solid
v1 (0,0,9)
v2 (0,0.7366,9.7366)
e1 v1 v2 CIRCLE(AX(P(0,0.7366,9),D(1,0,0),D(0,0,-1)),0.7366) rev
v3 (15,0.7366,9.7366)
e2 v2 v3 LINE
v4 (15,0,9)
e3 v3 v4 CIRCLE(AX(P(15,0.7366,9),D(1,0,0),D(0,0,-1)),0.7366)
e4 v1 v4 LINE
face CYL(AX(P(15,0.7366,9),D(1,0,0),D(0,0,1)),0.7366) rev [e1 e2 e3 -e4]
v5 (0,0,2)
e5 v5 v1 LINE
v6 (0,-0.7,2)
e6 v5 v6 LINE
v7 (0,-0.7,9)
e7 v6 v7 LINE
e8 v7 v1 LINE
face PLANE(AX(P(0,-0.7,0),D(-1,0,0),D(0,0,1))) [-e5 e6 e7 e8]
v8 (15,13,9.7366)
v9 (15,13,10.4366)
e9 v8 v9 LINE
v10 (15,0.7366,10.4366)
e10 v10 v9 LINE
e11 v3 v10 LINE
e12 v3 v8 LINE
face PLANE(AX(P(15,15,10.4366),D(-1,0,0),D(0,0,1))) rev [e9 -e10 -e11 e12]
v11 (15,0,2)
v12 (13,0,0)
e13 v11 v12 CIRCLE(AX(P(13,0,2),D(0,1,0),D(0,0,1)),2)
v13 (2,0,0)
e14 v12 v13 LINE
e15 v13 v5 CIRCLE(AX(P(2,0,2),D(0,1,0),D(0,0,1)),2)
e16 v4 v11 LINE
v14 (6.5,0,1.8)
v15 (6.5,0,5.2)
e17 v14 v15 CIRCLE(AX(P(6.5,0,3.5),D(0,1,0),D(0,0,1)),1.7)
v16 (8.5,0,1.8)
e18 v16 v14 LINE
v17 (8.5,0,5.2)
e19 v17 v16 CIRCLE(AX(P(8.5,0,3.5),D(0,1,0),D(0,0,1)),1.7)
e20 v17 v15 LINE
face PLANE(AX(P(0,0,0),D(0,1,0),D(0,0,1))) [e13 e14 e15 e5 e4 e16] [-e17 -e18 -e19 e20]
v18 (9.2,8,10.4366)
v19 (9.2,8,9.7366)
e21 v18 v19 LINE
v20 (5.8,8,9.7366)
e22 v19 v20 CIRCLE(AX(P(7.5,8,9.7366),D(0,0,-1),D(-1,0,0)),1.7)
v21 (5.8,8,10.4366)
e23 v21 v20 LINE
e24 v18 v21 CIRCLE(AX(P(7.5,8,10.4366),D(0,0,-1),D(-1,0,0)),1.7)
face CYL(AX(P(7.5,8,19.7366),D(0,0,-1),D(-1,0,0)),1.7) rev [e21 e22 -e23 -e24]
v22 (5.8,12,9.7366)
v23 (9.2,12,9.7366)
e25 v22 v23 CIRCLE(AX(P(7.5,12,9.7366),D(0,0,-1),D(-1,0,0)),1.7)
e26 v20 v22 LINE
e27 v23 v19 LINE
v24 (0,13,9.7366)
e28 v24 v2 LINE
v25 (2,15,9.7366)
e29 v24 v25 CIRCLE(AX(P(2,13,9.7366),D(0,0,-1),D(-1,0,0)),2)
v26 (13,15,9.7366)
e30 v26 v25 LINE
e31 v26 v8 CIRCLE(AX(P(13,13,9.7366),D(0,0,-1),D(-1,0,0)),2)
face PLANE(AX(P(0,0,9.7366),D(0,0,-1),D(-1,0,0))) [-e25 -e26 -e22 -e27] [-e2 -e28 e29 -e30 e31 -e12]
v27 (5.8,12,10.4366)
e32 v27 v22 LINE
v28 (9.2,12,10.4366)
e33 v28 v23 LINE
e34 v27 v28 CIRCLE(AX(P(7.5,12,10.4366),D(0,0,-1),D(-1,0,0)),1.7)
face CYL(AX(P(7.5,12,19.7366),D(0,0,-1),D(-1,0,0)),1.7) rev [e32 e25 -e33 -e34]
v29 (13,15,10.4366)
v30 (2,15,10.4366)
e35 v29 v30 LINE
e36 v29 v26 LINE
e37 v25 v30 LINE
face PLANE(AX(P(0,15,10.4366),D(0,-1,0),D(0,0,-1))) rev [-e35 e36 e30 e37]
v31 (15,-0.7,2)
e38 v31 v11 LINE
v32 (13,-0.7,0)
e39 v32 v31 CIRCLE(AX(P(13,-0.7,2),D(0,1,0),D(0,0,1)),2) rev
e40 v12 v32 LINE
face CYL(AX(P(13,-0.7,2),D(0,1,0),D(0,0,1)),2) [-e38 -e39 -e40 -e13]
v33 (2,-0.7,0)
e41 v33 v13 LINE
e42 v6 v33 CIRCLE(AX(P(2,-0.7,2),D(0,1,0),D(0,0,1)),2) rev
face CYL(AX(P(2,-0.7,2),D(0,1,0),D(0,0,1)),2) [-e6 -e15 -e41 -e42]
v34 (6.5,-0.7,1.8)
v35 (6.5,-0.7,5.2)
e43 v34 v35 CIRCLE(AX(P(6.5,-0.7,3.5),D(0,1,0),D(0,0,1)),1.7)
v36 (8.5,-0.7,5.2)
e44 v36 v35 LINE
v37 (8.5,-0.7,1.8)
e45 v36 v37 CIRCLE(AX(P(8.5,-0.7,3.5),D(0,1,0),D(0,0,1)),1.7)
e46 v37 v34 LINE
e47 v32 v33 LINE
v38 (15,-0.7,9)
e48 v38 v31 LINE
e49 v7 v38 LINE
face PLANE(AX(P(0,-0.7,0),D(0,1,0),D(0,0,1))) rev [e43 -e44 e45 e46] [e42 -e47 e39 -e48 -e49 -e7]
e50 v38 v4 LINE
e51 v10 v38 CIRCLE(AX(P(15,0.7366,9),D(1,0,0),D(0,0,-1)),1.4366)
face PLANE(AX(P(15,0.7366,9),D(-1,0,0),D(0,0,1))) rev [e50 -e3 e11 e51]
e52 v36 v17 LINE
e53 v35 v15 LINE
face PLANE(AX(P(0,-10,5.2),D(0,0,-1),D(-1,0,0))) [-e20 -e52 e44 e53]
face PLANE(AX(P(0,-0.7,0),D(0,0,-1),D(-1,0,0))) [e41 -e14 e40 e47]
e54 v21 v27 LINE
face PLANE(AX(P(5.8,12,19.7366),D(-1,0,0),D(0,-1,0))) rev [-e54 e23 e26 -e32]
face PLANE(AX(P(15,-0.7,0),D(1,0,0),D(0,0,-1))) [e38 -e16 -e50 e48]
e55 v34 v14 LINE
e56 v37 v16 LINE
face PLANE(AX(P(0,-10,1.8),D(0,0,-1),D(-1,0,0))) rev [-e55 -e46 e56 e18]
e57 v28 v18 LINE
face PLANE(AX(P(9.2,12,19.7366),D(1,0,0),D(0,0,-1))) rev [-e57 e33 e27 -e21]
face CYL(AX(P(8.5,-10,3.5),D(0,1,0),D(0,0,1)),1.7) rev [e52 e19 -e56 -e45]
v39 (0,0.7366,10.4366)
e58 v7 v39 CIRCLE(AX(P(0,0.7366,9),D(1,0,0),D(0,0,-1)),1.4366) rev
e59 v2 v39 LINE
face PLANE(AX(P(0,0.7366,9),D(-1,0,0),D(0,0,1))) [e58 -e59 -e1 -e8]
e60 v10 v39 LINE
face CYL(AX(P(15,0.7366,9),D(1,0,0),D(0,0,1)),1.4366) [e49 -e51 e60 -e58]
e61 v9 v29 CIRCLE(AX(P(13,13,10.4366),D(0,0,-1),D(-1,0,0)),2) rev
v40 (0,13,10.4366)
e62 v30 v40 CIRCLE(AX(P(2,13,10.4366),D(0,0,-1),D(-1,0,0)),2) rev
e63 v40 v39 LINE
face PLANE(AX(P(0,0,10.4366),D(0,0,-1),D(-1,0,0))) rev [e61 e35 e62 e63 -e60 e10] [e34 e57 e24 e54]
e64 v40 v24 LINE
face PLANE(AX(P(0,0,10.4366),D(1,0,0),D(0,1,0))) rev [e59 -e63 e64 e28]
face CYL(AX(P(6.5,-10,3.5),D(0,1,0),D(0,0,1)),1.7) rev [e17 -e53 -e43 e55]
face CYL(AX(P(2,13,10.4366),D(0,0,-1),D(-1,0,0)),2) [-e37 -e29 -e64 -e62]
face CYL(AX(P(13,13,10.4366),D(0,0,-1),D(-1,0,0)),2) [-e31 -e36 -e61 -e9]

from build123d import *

# Parameters (mm, degrees)
SKETCH1_W          = 15
SKETCH1_H          = 9
BASE_FLANGE1_DEPTH = 0.7
EDGE_FLANGE1_DEPTH = 15
CUT_EXTRUDE1_DEPTH = 10
FILLET1_R          = 2
CUT_EXTRUDE2_DEPTH = 10


# Sheet-metal steps are written as plain solids
with BuildPart() as part:
    # Sketch1 → Base-Flange1 (new body)
    with BuildSketch(Plane(origin=(0, 0, 0), x_dir=(1, 0, 0), z_dir=(0, 1, 0))):
        with Locations((7.5, -4.5)):
            Rectangle(SKETCH1_W, SKETCH1_H)
    extrude(amount=-BASE_FLANGE1_DEPTH)

    # Edge-Flange1 section (across the edge) → Edge-Flange1 (add)
    with BuildSketch(Plane(origin=(0, 0, 9.7366), x_dir=(0, 0, -1), z_dir=(1, 0, 0))):
        with BuildLine():
            Line((-0.7, 0.7366), (-0.7, 15))
            Line((-0.7, 15), (0, 15))
            Line((0, 15), (0, 0.7366))
            ThreePointArc((0, 0.7366), (0.215745145, 0.215745145), (0.7366, 0))
            Line((0.7366, 0), (0.7366, -0.7))
            ThreePointArc((0.7366, -0.7), (-0.279229602, -0.279229602), (-0.7, 0.7366))
        make_face()
    extrude(amount=EDGE_FLANGE1_DEPTH)

    # Sketch7 → Cut-Extrude1 (cut)
    with BuildSketch(Plane(origin=(0, 0, 0), x_dir=(1, 0, 0), z_dir=(0, 1, 0))):
        with BuildLine():
            Line((8.5, -5.2), (6.5, -5.2))
            ThreePointArc((6.5, -5.2), (4.8, -3.5), (6.5, -1.8))
            Line((6.5, -1.8), (8.5, -1.8))
            ThreePointArc((8.5, -1.8), (10.2, -3.5), (8.5, -5.2))
        make_face()
    extrude(amount=-CUT_EXTRUDE1_DEPTH, mode=Mode.SUBTRACT)

    # Fillet1
    fillet1_edges = [part.edges().sort_by_distance(p)[0] for p in [
        (0, 15, 10.0866),
        (15, 15, 10.0866),
        (0, -0.35, 0),
        (15, -0.35, 0),
    ]]
    fillet(fillet1_edges, radius=FILLET1_R)

    # Sketch8 → Cut-Extrude2 (cut)
    with BuildSketch(Plane(origin=(0, 0, 9.7366), x_dir=(-1, 0, 0), z_dir=(0, 0, -1))):
        with BuildLine():
            Line((-5.8, 12), (-5.8, 8))
            ThreePointArc((-5.8, 8), (-7.5, 6.3), (-9.2, 8))
            Line((-9.2, 8), (-9.2, 12))
            ThreePointArc((-9.2, 12), (-7.5, 13.7), (-5.8, 12))
        make_face()
    extrude(amount=-CUT_EXTRUDE2_DEPTH, mode=Mode.SUBTRACT)


solid = part.part
